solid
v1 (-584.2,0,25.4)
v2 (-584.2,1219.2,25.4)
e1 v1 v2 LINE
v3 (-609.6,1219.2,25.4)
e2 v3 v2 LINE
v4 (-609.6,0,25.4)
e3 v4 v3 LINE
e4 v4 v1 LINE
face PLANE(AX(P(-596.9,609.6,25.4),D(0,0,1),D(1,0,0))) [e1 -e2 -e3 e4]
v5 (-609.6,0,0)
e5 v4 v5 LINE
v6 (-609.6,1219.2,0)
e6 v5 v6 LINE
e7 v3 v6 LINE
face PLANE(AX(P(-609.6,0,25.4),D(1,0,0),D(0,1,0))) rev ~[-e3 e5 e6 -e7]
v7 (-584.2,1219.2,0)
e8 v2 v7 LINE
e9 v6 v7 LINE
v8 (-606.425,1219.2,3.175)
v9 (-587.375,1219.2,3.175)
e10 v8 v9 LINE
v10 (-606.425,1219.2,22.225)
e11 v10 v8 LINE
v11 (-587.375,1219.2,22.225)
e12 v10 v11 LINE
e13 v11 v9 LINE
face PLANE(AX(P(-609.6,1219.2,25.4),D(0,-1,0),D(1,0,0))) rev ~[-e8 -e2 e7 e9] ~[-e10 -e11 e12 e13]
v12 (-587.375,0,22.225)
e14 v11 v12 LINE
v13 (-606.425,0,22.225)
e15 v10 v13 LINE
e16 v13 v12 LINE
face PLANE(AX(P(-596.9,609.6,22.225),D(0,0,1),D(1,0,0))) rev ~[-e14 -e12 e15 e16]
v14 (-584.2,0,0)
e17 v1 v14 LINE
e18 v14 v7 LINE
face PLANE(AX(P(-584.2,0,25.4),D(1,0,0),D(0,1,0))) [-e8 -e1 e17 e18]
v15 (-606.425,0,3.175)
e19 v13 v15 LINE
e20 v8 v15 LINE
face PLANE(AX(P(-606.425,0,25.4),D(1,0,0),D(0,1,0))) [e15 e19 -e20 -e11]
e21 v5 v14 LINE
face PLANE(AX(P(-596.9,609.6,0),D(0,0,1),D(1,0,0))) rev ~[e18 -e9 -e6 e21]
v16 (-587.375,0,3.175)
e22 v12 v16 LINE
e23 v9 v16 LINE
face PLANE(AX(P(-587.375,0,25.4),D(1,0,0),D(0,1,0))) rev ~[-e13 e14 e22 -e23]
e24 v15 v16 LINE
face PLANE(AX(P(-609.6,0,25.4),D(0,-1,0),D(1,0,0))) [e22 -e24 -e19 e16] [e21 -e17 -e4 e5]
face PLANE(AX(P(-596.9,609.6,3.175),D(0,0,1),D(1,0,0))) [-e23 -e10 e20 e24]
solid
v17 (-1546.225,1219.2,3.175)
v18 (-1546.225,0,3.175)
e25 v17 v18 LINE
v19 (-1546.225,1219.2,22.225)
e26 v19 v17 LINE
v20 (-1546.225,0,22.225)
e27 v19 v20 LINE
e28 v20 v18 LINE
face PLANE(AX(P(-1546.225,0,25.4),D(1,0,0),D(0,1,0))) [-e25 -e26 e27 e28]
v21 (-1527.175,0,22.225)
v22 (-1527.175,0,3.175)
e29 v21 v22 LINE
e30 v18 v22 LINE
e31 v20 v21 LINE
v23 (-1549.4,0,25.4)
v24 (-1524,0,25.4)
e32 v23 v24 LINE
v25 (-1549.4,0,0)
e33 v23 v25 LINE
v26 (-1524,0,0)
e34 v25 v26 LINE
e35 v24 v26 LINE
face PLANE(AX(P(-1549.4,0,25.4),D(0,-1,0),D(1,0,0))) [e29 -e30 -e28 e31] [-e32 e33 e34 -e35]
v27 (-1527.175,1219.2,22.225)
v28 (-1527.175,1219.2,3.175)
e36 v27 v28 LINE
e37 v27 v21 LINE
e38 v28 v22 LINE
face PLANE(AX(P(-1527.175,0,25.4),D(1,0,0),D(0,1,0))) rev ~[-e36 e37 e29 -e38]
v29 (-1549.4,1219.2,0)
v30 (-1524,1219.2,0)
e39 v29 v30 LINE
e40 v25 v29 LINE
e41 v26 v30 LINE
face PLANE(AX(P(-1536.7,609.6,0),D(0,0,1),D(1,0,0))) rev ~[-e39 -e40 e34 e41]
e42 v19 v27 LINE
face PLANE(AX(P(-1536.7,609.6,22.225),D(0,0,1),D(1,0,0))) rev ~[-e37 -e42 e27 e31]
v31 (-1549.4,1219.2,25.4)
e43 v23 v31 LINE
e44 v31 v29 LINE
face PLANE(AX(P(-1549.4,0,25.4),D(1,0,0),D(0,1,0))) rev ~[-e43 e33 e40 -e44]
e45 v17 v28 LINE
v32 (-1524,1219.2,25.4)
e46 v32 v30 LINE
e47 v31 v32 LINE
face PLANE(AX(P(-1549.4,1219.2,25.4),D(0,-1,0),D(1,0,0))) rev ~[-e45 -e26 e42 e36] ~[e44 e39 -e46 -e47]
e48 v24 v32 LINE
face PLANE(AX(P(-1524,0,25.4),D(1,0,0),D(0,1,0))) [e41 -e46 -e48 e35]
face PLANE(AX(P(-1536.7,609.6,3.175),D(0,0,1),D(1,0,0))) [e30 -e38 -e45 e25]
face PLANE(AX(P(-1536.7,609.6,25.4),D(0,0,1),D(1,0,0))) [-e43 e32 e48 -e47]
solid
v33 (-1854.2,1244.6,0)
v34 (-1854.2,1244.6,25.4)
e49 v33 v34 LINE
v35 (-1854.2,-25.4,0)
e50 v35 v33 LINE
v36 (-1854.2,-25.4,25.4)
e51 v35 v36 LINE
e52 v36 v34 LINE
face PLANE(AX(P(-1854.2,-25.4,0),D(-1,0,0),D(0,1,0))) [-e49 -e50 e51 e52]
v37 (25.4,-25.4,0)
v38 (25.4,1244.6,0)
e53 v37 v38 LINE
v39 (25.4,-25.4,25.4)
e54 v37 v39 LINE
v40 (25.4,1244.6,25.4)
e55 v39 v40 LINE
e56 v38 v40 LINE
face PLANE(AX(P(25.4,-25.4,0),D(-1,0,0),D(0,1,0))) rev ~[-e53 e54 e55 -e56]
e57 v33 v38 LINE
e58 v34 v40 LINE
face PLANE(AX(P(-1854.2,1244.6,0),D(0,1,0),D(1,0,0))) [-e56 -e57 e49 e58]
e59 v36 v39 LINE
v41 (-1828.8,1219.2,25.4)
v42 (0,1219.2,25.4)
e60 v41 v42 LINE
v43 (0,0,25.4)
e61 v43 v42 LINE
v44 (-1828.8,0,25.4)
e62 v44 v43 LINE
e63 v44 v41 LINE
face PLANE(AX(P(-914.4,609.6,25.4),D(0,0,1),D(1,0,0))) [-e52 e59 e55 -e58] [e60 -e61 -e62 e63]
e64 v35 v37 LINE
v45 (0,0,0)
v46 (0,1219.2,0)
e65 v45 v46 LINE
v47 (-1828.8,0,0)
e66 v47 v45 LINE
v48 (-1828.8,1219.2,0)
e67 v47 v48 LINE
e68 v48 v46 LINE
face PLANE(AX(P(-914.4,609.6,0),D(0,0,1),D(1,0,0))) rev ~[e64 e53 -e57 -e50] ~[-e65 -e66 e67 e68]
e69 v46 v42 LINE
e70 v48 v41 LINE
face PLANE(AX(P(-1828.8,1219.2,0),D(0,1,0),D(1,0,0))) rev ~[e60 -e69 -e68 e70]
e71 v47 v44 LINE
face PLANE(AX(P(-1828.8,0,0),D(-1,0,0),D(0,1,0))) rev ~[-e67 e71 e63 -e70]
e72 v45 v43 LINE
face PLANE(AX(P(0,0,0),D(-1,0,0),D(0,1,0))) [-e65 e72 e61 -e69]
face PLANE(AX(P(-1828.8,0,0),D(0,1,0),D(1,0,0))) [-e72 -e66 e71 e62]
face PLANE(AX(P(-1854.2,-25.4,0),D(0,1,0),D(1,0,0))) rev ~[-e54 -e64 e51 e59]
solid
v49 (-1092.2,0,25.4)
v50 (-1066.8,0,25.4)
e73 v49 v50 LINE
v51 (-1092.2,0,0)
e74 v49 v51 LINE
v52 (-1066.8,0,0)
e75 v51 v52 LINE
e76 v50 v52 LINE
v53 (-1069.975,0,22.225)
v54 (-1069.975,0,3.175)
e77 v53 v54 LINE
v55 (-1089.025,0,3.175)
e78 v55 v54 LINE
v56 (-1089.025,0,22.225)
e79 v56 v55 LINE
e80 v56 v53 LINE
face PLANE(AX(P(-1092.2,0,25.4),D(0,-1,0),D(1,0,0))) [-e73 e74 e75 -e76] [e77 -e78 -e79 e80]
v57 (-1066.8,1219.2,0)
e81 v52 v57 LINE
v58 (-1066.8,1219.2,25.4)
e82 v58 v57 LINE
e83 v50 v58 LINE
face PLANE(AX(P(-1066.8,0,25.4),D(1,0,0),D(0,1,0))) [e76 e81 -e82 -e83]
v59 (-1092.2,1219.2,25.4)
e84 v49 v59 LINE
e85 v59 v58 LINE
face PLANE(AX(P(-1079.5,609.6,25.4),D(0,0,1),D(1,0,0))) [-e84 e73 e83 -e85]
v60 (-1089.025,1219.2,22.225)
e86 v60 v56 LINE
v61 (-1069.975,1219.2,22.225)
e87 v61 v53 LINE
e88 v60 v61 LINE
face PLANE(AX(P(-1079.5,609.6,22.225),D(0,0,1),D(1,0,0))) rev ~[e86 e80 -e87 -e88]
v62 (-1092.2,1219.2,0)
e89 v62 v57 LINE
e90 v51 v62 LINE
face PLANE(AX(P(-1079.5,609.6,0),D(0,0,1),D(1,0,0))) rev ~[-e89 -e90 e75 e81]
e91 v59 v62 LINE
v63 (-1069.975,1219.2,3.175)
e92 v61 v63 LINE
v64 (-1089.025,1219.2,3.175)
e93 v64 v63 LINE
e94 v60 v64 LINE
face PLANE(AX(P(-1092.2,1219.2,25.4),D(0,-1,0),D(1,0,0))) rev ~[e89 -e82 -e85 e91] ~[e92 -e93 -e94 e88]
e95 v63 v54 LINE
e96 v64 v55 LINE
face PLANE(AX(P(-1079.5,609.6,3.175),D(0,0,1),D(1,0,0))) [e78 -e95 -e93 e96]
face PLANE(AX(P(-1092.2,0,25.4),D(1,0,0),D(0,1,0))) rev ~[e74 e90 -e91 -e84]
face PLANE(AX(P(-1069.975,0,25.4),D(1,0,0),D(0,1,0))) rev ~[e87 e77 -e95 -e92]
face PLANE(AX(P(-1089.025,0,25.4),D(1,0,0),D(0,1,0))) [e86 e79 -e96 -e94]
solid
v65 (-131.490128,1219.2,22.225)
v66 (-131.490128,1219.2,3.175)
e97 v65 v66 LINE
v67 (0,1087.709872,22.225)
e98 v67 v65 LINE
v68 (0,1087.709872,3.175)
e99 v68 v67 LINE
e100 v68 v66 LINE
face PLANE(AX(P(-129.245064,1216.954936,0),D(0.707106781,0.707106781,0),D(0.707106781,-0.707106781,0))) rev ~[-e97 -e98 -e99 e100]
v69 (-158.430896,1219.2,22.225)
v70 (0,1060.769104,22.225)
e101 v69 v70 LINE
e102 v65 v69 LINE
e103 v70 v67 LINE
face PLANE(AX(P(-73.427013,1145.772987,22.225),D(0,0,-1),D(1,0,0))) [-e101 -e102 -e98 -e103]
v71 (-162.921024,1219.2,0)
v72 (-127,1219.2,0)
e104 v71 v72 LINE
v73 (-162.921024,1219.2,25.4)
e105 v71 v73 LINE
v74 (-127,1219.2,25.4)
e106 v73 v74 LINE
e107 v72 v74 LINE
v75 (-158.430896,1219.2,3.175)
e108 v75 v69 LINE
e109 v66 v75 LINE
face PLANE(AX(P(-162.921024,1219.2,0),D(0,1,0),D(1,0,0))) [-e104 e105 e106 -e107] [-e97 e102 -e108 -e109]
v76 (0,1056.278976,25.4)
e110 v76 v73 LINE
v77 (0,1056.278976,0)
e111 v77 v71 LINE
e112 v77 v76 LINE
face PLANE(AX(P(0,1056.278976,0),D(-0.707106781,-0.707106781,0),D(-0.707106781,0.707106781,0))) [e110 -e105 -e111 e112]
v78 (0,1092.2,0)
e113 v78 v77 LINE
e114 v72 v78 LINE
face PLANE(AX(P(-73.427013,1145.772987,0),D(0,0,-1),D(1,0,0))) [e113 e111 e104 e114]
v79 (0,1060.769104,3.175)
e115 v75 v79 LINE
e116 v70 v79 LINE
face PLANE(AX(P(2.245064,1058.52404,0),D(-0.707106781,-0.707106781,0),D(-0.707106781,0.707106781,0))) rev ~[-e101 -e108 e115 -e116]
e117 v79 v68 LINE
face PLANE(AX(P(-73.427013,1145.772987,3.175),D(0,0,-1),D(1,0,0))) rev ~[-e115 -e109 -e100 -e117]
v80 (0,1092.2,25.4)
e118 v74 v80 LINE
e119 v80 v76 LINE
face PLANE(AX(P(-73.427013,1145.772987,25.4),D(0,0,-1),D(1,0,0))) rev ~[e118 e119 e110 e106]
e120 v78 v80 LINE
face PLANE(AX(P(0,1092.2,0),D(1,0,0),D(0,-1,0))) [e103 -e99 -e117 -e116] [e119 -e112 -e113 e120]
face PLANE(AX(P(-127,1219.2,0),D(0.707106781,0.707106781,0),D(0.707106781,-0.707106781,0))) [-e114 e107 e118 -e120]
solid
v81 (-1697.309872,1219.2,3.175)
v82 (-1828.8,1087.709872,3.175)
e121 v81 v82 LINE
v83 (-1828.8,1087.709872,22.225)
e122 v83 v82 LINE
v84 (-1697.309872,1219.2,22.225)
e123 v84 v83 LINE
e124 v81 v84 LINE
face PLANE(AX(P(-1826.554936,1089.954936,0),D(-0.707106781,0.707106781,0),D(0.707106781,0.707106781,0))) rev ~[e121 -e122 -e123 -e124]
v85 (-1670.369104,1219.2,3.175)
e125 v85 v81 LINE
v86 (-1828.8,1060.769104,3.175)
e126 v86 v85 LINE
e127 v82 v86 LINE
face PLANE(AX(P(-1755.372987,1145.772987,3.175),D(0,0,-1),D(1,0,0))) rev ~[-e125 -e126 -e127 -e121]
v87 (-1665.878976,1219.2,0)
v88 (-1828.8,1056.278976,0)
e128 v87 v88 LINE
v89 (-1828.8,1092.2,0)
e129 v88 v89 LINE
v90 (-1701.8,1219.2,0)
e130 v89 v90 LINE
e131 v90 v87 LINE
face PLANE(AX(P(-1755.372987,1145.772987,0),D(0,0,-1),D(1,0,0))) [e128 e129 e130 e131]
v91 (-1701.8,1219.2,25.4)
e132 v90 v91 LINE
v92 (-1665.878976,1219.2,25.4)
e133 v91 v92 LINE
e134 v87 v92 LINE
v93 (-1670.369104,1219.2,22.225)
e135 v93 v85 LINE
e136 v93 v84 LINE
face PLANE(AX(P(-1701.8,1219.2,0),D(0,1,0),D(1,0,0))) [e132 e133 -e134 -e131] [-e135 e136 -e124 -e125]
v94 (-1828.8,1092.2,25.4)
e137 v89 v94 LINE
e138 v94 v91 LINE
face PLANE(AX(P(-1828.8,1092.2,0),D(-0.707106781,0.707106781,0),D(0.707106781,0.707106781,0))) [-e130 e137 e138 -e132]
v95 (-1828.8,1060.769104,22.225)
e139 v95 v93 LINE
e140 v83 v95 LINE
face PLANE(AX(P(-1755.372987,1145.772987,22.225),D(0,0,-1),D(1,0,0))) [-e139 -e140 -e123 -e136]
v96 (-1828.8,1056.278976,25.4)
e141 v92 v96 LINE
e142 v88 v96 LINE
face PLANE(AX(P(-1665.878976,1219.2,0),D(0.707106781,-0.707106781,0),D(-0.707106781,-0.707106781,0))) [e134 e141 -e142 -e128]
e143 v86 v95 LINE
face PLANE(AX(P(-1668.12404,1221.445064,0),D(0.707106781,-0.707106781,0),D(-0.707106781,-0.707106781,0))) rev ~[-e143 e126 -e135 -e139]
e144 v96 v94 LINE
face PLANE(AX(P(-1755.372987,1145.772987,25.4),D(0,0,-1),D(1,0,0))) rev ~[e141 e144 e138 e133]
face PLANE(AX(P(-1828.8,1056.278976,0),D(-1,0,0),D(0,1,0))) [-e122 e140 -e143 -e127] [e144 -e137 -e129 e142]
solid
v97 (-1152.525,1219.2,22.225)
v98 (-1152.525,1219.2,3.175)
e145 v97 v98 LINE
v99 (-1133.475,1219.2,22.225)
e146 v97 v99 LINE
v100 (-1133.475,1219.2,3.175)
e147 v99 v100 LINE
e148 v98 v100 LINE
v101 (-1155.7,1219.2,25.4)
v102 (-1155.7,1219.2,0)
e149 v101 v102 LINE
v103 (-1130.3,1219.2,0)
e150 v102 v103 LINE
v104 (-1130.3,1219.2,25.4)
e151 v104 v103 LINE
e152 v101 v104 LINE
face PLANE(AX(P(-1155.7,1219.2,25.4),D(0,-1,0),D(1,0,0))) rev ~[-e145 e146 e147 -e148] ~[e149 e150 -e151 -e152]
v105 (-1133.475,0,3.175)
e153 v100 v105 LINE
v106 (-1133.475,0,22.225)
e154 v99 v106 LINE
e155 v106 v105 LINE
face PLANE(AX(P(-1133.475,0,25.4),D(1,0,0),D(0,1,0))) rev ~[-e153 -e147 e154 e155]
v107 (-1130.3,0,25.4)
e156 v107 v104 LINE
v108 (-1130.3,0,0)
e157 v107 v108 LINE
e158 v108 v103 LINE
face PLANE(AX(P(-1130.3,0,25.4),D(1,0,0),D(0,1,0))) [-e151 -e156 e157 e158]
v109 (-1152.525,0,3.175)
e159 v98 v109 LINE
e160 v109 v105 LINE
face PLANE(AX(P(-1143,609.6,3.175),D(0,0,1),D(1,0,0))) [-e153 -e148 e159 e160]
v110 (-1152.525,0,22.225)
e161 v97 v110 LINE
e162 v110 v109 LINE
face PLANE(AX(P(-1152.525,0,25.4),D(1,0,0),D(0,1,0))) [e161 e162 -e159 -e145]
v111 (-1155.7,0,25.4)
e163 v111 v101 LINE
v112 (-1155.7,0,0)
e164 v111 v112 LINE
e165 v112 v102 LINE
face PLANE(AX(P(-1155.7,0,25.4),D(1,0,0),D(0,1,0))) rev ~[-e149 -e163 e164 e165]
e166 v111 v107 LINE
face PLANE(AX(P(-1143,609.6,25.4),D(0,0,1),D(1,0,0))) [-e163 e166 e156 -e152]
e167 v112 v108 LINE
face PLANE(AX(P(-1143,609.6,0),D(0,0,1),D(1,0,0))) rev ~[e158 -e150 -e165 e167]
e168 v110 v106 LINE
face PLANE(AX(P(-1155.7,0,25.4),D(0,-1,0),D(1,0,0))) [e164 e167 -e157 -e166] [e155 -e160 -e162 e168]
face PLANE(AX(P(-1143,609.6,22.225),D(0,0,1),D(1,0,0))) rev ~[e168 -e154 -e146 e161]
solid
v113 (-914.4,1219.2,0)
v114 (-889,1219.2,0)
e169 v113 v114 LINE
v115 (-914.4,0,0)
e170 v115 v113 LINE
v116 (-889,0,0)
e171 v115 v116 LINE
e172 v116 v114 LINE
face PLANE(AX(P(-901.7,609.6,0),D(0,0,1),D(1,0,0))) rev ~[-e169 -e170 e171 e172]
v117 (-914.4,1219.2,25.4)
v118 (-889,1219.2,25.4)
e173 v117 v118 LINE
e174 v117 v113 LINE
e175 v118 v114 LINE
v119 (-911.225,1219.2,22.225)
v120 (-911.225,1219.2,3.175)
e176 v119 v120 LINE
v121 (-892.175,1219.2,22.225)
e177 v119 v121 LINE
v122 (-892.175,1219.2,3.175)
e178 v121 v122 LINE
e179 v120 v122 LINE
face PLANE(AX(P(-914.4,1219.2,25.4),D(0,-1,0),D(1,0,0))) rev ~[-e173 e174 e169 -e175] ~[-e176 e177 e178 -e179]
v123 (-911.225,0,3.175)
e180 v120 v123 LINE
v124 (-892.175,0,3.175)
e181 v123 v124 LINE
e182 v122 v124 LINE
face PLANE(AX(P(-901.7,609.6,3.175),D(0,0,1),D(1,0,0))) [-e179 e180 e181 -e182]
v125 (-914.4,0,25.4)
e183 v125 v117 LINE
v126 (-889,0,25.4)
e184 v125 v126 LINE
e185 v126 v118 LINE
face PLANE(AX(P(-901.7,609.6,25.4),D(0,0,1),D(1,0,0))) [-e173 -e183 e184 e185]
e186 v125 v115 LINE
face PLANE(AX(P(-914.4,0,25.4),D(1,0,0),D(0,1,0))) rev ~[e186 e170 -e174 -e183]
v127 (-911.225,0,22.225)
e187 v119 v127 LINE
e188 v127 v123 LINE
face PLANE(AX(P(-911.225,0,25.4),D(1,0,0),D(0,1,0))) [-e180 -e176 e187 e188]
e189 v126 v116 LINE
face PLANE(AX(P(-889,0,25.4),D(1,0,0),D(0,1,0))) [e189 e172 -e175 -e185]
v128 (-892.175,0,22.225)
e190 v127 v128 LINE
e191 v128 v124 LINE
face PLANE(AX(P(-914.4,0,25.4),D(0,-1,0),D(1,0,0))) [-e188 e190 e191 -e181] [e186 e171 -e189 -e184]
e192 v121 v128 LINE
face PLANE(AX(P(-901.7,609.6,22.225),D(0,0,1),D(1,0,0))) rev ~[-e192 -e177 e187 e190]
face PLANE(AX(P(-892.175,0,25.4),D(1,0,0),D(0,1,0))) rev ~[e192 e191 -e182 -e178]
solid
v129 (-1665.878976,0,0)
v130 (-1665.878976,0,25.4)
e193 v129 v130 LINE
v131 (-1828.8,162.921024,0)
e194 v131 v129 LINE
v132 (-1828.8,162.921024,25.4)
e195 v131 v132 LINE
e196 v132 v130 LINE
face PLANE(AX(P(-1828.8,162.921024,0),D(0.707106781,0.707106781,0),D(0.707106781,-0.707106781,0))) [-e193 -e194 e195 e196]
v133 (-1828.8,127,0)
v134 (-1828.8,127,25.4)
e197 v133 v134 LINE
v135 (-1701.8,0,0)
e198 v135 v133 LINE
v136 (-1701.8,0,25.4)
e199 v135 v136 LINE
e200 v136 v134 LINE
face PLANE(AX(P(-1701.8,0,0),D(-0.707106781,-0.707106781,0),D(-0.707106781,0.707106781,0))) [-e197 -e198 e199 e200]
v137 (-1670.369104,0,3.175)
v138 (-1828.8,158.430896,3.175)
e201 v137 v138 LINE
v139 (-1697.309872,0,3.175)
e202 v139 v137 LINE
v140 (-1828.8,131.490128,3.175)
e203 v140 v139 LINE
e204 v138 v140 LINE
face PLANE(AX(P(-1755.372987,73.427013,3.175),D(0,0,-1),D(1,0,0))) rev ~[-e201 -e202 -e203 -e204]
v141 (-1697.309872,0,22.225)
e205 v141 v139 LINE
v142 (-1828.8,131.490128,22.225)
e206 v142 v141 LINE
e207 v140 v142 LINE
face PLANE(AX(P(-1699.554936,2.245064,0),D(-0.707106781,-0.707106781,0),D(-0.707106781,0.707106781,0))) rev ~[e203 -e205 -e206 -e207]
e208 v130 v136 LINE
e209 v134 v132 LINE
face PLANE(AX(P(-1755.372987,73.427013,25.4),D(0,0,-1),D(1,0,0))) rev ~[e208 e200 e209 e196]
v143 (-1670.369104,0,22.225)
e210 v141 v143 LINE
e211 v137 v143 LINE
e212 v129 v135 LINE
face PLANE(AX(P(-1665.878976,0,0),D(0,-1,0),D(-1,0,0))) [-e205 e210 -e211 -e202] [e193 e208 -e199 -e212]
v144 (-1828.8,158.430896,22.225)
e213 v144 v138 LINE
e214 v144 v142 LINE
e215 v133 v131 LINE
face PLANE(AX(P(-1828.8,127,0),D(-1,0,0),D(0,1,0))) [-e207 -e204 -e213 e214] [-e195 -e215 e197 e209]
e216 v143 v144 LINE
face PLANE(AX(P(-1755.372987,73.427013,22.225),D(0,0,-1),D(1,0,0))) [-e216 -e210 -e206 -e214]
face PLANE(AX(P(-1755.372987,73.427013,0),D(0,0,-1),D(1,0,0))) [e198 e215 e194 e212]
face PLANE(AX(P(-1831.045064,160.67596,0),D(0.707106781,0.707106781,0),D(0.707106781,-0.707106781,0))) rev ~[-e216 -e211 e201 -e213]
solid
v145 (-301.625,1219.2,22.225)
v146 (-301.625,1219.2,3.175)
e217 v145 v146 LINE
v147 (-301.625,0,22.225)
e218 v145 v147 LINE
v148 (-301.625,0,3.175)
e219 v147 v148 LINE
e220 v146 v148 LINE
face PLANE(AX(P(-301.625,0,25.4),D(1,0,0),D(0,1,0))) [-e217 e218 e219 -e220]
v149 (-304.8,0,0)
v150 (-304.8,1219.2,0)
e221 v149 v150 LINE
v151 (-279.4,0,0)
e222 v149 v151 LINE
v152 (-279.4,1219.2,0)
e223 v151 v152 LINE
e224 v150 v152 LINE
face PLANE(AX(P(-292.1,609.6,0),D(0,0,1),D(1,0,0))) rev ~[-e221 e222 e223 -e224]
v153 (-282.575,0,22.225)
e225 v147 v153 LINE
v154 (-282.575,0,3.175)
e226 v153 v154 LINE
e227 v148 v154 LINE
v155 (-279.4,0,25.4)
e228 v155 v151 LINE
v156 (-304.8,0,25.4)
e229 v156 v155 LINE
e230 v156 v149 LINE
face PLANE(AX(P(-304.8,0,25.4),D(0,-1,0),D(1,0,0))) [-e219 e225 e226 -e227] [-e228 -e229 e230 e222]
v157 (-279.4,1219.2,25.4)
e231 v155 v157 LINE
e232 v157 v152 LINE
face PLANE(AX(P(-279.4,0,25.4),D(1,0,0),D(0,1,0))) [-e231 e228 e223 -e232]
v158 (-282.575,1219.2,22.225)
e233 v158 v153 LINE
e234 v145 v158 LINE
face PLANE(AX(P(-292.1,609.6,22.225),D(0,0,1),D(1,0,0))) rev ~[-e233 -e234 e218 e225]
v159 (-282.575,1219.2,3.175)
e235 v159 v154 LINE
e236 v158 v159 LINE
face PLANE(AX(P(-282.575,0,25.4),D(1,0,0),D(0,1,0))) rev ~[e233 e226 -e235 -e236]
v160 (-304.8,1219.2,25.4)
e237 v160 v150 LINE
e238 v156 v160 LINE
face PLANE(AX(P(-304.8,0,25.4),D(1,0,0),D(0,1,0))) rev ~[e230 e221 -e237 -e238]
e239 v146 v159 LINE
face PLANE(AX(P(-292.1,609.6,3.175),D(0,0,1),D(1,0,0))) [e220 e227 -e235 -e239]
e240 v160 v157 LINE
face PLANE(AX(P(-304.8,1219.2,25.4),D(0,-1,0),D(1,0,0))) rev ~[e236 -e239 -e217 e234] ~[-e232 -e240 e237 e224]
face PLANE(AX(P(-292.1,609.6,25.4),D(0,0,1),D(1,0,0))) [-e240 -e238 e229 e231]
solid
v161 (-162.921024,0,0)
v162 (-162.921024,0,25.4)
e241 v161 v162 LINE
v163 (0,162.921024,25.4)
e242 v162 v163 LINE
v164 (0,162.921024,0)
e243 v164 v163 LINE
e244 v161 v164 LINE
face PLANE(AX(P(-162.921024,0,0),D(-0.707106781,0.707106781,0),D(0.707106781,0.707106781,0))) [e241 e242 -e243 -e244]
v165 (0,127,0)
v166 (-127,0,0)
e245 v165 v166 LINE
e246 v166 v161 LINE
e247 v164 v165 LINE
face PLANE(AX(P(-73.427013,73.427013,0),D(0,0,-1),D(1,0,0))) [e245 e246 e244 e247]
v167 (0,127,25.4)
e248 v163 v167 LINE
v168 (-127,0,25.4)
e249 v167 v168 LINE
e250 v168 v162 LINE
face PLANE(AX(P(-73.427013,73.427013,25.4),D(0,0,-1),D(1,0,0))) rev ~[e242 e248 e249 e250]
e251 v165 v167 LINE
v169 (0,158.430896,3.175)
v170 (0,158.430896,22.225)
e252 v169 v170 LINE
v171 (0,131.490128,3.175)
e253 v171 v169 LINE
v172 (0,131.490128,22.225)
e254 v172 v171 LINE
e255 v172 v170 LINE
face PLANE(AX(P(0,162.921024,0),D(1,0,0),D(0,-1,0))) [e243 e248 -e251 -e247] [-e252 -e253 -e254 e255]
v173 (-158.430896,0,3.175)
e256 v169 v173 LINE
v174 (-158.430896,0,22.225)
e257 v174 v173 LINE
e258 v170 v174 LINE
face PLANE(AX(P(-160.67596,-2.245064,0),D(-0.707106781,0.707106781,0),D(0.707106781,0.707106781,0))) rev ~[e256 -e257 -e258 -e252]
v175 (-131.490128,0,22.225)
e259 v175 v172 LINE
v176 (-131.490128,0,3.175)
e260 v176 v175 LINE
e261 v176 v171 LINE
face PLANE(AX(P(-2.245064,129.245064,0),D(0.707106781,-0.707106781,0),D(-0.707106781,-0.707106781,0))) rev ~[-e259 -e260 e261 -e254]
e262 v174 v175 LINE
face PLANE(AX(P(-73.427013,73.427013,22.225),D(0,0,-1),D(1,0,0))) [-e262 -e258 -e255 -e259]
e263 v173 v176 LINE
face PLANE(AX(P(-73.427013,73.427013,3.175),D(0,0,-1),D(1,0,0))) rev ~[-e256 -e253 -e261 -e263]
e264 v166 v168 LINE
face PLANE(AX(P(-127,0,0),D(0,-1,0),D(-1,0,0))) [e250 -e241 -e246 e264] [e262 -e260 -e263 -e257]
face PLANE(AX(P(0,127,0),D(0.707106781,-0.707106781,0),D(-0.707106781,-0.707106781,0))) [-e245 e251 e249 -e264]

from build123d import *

# Parameters (mm, degrees)
F0_W     = 1879.6
F0_H     = 1270
F0_W_2   = 1828.8
F0_H_2   = 1219.2
F1_DEPTH = 25.4
F2_W     = 25.4
F2_H     = 1219.2
F3_DEPTH = 25.4
F5_DEPTH = 25.4
F6_T     = -3.175
F7_T     = -3.175
F8_T     = -3.175
F9_T     = -3.175
F10_T    = -3.175
F10_2_T  = -3.175
F10_3_T  = -3.175
F10_4_T  = -3.175
F10_5_T  = -3.175
F10_6_T  = -3.175


with BuildPart() as f1:
    # F0 (on Top) → F1 (new body)
    with BuildSketch(Plane.XY):
        with Locations((-914.4, 609.6)):
            Rectangle(F0_W, F0_H)
        with Locations((-914.4, 609.6)):
            Rectangle(F0_W_2, F0_H_2, mode=Mode.SUBTRACT)
    extrude(amount=F1_DEPTH)


with BuildPart() as f3:
    # F2 (on face) → F3 (new body)
    with BuildSketch(Plane.XY.offset(25.4)):
        with Locations((-1536.7, 609.6)):
            Rectangle(F2_W, F2_H)
    extrude(amount=-F3_DEPTH)

    # F10#6
    f10_6_openings = [f3.faces().sort_by_distance(p)[0] for p in [
        (-1536.7, 0, 12.7),
        (-1536.7, 1219.2, 12.7),
    ]]
    offset(amount=F10_6_T, openings=f10_6_openings)


with BuildPart() as f3b:
    # F2 (on face) → F3, piece 2 (new body)
    with BuildSketch(Plane.XY.offset(25.4)):
        with Locations((-1143, 609.6)):
            Rectangle(F2_W, F2_H)
    extrude(amount=-F3_DEPTH)

    # F10#5
    f10_5_openings = [f3b.faces().sort_by_distance(p)[0] for p in [
        (-1143, 0, 12.7),
        (-1143, 1219.2, 12.7),
    ]]
    offset(amount=F10_5_T, openings=f10_5_openings)


with BuildPart() as f3c:
    # F2 (on face) → F3, piece 3 (new body)
    with BuildSketch(Plane.XY.offset(25.4)):
        with Locations((-1079.5, 609.6)):
            Rectangle(F2_W, F2_H)
    extrude(amount=-F3_DEPTH)

    # F10#4
    f10_4_openings = [f3c.faces().sort_by_distance(p)[0] for p in [
        (-1079.5, 0, 12.7),
        (-1079.5, 1219.2, 12.7),
    ]]
    offset(amount=F10_4_T, openings=f10_4_openings)


with BuildPart() as f3d:
    # F2 (on face) → F3, piece 4 (new body)
    with BuildSketch(Plane.XY.offset(25.4)):
        with Locations((-901.7, 609.6)):
            Rectangle(F2_W, F2_H)
    extrude(amount=-F3_DEPTH)

    # F10#3
    f10_3_openings = [f3d.faces().sort_by_distance(p)[0] for p in [
        (-901.7, 1219.2, 12.7),
        (-901.7, 0, 12.7),
    ]]
    offset(amount=F10_3_T, openings=f10_3_openings)


with BuildPart() as f3e:
    # F2 (on face) → F3, piece 5 (new body)
    with BuildSketch(Plane.XY.offset(25.4)):
        with Locations((-596.9, 609.6)):
            Rectangle(F2_W, F2_H)
    extrude(amount=-F3_DEPTH)

    # F10#2
    f10_2_openings = [f3e.faces().sort_by_distance(p)[0] for p in [
        (-596.9, 0, 12.7),
        (-596.9, 1219.2, 12.7),
    ]]
    offset(amount=F10_2_T, openings=f10_2_openings)


with BuildPart() as f3f:
    # F2 (on face) → F3, piece 6 (new body)
    with BuildSketch(Plane.XY.offset(25.4)):
        with Locations((-292.1, 609.6)):
            Rectangle(F2_W, F2_H)
    extrude(amount=-F3_DEPTH)

    # F10
    f10_openings = [f3f.faces().sort_by_distance(p)[0] for p in [
        (-292.1, 1219.2, 12.7),
        (-292.1, 0, 12.7),
    ]]
    offset(amount=F10_T, openings=f10_openings)


with BuildPart() as f5:
    # F4 (on face) → F5 (new body)
    with BuildSketch(Plane(origin=(0, 0, 0), x_dir=(1, 0, 0), z_dir=(0, 0, -1))):
        Polygon((-1665.8789755157, 0), (-1701.8, 0), (-1828.8, -127), (-1828.8, -162.9210244843), align=None)
    extrude(amount=-F5_DEPTH)

    # F7
    f7_openings = [f5.faces().sort_by_distance(p)[0] for p in [
        (-1828.8, 144.960512, 12.7),
        (-1683.839488, 0, 12.7),
    ]]
    offset(amount=F7_T, openings=f7_openings, kind=Kind.INTERSECTION)


with BuildPart() as f5b:
    # F4 (on face) → F5, piece 2 (new body)
    with BuildSketch(Plane(origin=(0, 0, 0), x_dir=(1, 0, 0), z_dir=(0, 0, -1))):
        Polygon((-1665.8789755157, -1219.2), (-1828.8, -1056.2789755157), (-1828.8, -1092.2), (-1701.8, -1219.2), align=None)
    extrude(amount=-F5_DEPTH)

    # F6
    f6_openings = [f5b.faces().sort_by_distance(p)[0] for p in [
        (-1828.8, 1074.239488, 12.7),
        (-1683.839488, 1219.2, 12.7),
    ]]
    offset(amount=F6_T, openings=f6_openings, kind=Kind.INTERSECTION)


with BuildPart() as f5c:
    # F4 (on face) → F5, piece 3 (new body)
    with BuildSketch(Plane(origin=(0, 0, 0), x_dir=(1, 0, 0), z_dir=(0, 0, -1))):
        Polygon((0, -1092.2), (0, -1056.2789755157), (-162.9210244843, -1219.2), (-127, -1219.2), align=None)
    extrude(amount=-F5_DEPTH)

    # F9
    f9_openings = [f5c.faces().sort_by_distance(p)[0] for p in [
        (0, 1074.239488, 12.7),
        (-144.960512, 1219.2, 12.7),
    ]]
    offset(amount=F9_T, openings=f9_openings, kind=Kind.INTERSECTION)


with BuildPart() as f5d:
    # F4 (on face) → F5, piece 4 (new body)
    with BuildSketch(Plane(origin=(0, 0, 0), x_dir=(1, 0, 0), z_dir=(0, 0, -1))):
        Polygon((-127, 0), (-162.9210244843, 0), (0, -162.9210244843), (0, -127), align=None)
    extrude(amount=-F5_DEPTH)

    # F8
    f8_openings = [f5d.faces().sort_by_distance(p)[0] for p in [
        (0, 144.960512, 12.7),
        (-144.960512, 0, 12.7),
    ]]
    offset(amount=F8_T, openings=f8_openings, kind=Kind.INTERSECTION)


solid = Compound([f1.part, f3.part, f3b.part, f3c.part, f3d.part, f3e.part, f3f.part, f5.part, f5b.part, f5c.part, f5d.part])
